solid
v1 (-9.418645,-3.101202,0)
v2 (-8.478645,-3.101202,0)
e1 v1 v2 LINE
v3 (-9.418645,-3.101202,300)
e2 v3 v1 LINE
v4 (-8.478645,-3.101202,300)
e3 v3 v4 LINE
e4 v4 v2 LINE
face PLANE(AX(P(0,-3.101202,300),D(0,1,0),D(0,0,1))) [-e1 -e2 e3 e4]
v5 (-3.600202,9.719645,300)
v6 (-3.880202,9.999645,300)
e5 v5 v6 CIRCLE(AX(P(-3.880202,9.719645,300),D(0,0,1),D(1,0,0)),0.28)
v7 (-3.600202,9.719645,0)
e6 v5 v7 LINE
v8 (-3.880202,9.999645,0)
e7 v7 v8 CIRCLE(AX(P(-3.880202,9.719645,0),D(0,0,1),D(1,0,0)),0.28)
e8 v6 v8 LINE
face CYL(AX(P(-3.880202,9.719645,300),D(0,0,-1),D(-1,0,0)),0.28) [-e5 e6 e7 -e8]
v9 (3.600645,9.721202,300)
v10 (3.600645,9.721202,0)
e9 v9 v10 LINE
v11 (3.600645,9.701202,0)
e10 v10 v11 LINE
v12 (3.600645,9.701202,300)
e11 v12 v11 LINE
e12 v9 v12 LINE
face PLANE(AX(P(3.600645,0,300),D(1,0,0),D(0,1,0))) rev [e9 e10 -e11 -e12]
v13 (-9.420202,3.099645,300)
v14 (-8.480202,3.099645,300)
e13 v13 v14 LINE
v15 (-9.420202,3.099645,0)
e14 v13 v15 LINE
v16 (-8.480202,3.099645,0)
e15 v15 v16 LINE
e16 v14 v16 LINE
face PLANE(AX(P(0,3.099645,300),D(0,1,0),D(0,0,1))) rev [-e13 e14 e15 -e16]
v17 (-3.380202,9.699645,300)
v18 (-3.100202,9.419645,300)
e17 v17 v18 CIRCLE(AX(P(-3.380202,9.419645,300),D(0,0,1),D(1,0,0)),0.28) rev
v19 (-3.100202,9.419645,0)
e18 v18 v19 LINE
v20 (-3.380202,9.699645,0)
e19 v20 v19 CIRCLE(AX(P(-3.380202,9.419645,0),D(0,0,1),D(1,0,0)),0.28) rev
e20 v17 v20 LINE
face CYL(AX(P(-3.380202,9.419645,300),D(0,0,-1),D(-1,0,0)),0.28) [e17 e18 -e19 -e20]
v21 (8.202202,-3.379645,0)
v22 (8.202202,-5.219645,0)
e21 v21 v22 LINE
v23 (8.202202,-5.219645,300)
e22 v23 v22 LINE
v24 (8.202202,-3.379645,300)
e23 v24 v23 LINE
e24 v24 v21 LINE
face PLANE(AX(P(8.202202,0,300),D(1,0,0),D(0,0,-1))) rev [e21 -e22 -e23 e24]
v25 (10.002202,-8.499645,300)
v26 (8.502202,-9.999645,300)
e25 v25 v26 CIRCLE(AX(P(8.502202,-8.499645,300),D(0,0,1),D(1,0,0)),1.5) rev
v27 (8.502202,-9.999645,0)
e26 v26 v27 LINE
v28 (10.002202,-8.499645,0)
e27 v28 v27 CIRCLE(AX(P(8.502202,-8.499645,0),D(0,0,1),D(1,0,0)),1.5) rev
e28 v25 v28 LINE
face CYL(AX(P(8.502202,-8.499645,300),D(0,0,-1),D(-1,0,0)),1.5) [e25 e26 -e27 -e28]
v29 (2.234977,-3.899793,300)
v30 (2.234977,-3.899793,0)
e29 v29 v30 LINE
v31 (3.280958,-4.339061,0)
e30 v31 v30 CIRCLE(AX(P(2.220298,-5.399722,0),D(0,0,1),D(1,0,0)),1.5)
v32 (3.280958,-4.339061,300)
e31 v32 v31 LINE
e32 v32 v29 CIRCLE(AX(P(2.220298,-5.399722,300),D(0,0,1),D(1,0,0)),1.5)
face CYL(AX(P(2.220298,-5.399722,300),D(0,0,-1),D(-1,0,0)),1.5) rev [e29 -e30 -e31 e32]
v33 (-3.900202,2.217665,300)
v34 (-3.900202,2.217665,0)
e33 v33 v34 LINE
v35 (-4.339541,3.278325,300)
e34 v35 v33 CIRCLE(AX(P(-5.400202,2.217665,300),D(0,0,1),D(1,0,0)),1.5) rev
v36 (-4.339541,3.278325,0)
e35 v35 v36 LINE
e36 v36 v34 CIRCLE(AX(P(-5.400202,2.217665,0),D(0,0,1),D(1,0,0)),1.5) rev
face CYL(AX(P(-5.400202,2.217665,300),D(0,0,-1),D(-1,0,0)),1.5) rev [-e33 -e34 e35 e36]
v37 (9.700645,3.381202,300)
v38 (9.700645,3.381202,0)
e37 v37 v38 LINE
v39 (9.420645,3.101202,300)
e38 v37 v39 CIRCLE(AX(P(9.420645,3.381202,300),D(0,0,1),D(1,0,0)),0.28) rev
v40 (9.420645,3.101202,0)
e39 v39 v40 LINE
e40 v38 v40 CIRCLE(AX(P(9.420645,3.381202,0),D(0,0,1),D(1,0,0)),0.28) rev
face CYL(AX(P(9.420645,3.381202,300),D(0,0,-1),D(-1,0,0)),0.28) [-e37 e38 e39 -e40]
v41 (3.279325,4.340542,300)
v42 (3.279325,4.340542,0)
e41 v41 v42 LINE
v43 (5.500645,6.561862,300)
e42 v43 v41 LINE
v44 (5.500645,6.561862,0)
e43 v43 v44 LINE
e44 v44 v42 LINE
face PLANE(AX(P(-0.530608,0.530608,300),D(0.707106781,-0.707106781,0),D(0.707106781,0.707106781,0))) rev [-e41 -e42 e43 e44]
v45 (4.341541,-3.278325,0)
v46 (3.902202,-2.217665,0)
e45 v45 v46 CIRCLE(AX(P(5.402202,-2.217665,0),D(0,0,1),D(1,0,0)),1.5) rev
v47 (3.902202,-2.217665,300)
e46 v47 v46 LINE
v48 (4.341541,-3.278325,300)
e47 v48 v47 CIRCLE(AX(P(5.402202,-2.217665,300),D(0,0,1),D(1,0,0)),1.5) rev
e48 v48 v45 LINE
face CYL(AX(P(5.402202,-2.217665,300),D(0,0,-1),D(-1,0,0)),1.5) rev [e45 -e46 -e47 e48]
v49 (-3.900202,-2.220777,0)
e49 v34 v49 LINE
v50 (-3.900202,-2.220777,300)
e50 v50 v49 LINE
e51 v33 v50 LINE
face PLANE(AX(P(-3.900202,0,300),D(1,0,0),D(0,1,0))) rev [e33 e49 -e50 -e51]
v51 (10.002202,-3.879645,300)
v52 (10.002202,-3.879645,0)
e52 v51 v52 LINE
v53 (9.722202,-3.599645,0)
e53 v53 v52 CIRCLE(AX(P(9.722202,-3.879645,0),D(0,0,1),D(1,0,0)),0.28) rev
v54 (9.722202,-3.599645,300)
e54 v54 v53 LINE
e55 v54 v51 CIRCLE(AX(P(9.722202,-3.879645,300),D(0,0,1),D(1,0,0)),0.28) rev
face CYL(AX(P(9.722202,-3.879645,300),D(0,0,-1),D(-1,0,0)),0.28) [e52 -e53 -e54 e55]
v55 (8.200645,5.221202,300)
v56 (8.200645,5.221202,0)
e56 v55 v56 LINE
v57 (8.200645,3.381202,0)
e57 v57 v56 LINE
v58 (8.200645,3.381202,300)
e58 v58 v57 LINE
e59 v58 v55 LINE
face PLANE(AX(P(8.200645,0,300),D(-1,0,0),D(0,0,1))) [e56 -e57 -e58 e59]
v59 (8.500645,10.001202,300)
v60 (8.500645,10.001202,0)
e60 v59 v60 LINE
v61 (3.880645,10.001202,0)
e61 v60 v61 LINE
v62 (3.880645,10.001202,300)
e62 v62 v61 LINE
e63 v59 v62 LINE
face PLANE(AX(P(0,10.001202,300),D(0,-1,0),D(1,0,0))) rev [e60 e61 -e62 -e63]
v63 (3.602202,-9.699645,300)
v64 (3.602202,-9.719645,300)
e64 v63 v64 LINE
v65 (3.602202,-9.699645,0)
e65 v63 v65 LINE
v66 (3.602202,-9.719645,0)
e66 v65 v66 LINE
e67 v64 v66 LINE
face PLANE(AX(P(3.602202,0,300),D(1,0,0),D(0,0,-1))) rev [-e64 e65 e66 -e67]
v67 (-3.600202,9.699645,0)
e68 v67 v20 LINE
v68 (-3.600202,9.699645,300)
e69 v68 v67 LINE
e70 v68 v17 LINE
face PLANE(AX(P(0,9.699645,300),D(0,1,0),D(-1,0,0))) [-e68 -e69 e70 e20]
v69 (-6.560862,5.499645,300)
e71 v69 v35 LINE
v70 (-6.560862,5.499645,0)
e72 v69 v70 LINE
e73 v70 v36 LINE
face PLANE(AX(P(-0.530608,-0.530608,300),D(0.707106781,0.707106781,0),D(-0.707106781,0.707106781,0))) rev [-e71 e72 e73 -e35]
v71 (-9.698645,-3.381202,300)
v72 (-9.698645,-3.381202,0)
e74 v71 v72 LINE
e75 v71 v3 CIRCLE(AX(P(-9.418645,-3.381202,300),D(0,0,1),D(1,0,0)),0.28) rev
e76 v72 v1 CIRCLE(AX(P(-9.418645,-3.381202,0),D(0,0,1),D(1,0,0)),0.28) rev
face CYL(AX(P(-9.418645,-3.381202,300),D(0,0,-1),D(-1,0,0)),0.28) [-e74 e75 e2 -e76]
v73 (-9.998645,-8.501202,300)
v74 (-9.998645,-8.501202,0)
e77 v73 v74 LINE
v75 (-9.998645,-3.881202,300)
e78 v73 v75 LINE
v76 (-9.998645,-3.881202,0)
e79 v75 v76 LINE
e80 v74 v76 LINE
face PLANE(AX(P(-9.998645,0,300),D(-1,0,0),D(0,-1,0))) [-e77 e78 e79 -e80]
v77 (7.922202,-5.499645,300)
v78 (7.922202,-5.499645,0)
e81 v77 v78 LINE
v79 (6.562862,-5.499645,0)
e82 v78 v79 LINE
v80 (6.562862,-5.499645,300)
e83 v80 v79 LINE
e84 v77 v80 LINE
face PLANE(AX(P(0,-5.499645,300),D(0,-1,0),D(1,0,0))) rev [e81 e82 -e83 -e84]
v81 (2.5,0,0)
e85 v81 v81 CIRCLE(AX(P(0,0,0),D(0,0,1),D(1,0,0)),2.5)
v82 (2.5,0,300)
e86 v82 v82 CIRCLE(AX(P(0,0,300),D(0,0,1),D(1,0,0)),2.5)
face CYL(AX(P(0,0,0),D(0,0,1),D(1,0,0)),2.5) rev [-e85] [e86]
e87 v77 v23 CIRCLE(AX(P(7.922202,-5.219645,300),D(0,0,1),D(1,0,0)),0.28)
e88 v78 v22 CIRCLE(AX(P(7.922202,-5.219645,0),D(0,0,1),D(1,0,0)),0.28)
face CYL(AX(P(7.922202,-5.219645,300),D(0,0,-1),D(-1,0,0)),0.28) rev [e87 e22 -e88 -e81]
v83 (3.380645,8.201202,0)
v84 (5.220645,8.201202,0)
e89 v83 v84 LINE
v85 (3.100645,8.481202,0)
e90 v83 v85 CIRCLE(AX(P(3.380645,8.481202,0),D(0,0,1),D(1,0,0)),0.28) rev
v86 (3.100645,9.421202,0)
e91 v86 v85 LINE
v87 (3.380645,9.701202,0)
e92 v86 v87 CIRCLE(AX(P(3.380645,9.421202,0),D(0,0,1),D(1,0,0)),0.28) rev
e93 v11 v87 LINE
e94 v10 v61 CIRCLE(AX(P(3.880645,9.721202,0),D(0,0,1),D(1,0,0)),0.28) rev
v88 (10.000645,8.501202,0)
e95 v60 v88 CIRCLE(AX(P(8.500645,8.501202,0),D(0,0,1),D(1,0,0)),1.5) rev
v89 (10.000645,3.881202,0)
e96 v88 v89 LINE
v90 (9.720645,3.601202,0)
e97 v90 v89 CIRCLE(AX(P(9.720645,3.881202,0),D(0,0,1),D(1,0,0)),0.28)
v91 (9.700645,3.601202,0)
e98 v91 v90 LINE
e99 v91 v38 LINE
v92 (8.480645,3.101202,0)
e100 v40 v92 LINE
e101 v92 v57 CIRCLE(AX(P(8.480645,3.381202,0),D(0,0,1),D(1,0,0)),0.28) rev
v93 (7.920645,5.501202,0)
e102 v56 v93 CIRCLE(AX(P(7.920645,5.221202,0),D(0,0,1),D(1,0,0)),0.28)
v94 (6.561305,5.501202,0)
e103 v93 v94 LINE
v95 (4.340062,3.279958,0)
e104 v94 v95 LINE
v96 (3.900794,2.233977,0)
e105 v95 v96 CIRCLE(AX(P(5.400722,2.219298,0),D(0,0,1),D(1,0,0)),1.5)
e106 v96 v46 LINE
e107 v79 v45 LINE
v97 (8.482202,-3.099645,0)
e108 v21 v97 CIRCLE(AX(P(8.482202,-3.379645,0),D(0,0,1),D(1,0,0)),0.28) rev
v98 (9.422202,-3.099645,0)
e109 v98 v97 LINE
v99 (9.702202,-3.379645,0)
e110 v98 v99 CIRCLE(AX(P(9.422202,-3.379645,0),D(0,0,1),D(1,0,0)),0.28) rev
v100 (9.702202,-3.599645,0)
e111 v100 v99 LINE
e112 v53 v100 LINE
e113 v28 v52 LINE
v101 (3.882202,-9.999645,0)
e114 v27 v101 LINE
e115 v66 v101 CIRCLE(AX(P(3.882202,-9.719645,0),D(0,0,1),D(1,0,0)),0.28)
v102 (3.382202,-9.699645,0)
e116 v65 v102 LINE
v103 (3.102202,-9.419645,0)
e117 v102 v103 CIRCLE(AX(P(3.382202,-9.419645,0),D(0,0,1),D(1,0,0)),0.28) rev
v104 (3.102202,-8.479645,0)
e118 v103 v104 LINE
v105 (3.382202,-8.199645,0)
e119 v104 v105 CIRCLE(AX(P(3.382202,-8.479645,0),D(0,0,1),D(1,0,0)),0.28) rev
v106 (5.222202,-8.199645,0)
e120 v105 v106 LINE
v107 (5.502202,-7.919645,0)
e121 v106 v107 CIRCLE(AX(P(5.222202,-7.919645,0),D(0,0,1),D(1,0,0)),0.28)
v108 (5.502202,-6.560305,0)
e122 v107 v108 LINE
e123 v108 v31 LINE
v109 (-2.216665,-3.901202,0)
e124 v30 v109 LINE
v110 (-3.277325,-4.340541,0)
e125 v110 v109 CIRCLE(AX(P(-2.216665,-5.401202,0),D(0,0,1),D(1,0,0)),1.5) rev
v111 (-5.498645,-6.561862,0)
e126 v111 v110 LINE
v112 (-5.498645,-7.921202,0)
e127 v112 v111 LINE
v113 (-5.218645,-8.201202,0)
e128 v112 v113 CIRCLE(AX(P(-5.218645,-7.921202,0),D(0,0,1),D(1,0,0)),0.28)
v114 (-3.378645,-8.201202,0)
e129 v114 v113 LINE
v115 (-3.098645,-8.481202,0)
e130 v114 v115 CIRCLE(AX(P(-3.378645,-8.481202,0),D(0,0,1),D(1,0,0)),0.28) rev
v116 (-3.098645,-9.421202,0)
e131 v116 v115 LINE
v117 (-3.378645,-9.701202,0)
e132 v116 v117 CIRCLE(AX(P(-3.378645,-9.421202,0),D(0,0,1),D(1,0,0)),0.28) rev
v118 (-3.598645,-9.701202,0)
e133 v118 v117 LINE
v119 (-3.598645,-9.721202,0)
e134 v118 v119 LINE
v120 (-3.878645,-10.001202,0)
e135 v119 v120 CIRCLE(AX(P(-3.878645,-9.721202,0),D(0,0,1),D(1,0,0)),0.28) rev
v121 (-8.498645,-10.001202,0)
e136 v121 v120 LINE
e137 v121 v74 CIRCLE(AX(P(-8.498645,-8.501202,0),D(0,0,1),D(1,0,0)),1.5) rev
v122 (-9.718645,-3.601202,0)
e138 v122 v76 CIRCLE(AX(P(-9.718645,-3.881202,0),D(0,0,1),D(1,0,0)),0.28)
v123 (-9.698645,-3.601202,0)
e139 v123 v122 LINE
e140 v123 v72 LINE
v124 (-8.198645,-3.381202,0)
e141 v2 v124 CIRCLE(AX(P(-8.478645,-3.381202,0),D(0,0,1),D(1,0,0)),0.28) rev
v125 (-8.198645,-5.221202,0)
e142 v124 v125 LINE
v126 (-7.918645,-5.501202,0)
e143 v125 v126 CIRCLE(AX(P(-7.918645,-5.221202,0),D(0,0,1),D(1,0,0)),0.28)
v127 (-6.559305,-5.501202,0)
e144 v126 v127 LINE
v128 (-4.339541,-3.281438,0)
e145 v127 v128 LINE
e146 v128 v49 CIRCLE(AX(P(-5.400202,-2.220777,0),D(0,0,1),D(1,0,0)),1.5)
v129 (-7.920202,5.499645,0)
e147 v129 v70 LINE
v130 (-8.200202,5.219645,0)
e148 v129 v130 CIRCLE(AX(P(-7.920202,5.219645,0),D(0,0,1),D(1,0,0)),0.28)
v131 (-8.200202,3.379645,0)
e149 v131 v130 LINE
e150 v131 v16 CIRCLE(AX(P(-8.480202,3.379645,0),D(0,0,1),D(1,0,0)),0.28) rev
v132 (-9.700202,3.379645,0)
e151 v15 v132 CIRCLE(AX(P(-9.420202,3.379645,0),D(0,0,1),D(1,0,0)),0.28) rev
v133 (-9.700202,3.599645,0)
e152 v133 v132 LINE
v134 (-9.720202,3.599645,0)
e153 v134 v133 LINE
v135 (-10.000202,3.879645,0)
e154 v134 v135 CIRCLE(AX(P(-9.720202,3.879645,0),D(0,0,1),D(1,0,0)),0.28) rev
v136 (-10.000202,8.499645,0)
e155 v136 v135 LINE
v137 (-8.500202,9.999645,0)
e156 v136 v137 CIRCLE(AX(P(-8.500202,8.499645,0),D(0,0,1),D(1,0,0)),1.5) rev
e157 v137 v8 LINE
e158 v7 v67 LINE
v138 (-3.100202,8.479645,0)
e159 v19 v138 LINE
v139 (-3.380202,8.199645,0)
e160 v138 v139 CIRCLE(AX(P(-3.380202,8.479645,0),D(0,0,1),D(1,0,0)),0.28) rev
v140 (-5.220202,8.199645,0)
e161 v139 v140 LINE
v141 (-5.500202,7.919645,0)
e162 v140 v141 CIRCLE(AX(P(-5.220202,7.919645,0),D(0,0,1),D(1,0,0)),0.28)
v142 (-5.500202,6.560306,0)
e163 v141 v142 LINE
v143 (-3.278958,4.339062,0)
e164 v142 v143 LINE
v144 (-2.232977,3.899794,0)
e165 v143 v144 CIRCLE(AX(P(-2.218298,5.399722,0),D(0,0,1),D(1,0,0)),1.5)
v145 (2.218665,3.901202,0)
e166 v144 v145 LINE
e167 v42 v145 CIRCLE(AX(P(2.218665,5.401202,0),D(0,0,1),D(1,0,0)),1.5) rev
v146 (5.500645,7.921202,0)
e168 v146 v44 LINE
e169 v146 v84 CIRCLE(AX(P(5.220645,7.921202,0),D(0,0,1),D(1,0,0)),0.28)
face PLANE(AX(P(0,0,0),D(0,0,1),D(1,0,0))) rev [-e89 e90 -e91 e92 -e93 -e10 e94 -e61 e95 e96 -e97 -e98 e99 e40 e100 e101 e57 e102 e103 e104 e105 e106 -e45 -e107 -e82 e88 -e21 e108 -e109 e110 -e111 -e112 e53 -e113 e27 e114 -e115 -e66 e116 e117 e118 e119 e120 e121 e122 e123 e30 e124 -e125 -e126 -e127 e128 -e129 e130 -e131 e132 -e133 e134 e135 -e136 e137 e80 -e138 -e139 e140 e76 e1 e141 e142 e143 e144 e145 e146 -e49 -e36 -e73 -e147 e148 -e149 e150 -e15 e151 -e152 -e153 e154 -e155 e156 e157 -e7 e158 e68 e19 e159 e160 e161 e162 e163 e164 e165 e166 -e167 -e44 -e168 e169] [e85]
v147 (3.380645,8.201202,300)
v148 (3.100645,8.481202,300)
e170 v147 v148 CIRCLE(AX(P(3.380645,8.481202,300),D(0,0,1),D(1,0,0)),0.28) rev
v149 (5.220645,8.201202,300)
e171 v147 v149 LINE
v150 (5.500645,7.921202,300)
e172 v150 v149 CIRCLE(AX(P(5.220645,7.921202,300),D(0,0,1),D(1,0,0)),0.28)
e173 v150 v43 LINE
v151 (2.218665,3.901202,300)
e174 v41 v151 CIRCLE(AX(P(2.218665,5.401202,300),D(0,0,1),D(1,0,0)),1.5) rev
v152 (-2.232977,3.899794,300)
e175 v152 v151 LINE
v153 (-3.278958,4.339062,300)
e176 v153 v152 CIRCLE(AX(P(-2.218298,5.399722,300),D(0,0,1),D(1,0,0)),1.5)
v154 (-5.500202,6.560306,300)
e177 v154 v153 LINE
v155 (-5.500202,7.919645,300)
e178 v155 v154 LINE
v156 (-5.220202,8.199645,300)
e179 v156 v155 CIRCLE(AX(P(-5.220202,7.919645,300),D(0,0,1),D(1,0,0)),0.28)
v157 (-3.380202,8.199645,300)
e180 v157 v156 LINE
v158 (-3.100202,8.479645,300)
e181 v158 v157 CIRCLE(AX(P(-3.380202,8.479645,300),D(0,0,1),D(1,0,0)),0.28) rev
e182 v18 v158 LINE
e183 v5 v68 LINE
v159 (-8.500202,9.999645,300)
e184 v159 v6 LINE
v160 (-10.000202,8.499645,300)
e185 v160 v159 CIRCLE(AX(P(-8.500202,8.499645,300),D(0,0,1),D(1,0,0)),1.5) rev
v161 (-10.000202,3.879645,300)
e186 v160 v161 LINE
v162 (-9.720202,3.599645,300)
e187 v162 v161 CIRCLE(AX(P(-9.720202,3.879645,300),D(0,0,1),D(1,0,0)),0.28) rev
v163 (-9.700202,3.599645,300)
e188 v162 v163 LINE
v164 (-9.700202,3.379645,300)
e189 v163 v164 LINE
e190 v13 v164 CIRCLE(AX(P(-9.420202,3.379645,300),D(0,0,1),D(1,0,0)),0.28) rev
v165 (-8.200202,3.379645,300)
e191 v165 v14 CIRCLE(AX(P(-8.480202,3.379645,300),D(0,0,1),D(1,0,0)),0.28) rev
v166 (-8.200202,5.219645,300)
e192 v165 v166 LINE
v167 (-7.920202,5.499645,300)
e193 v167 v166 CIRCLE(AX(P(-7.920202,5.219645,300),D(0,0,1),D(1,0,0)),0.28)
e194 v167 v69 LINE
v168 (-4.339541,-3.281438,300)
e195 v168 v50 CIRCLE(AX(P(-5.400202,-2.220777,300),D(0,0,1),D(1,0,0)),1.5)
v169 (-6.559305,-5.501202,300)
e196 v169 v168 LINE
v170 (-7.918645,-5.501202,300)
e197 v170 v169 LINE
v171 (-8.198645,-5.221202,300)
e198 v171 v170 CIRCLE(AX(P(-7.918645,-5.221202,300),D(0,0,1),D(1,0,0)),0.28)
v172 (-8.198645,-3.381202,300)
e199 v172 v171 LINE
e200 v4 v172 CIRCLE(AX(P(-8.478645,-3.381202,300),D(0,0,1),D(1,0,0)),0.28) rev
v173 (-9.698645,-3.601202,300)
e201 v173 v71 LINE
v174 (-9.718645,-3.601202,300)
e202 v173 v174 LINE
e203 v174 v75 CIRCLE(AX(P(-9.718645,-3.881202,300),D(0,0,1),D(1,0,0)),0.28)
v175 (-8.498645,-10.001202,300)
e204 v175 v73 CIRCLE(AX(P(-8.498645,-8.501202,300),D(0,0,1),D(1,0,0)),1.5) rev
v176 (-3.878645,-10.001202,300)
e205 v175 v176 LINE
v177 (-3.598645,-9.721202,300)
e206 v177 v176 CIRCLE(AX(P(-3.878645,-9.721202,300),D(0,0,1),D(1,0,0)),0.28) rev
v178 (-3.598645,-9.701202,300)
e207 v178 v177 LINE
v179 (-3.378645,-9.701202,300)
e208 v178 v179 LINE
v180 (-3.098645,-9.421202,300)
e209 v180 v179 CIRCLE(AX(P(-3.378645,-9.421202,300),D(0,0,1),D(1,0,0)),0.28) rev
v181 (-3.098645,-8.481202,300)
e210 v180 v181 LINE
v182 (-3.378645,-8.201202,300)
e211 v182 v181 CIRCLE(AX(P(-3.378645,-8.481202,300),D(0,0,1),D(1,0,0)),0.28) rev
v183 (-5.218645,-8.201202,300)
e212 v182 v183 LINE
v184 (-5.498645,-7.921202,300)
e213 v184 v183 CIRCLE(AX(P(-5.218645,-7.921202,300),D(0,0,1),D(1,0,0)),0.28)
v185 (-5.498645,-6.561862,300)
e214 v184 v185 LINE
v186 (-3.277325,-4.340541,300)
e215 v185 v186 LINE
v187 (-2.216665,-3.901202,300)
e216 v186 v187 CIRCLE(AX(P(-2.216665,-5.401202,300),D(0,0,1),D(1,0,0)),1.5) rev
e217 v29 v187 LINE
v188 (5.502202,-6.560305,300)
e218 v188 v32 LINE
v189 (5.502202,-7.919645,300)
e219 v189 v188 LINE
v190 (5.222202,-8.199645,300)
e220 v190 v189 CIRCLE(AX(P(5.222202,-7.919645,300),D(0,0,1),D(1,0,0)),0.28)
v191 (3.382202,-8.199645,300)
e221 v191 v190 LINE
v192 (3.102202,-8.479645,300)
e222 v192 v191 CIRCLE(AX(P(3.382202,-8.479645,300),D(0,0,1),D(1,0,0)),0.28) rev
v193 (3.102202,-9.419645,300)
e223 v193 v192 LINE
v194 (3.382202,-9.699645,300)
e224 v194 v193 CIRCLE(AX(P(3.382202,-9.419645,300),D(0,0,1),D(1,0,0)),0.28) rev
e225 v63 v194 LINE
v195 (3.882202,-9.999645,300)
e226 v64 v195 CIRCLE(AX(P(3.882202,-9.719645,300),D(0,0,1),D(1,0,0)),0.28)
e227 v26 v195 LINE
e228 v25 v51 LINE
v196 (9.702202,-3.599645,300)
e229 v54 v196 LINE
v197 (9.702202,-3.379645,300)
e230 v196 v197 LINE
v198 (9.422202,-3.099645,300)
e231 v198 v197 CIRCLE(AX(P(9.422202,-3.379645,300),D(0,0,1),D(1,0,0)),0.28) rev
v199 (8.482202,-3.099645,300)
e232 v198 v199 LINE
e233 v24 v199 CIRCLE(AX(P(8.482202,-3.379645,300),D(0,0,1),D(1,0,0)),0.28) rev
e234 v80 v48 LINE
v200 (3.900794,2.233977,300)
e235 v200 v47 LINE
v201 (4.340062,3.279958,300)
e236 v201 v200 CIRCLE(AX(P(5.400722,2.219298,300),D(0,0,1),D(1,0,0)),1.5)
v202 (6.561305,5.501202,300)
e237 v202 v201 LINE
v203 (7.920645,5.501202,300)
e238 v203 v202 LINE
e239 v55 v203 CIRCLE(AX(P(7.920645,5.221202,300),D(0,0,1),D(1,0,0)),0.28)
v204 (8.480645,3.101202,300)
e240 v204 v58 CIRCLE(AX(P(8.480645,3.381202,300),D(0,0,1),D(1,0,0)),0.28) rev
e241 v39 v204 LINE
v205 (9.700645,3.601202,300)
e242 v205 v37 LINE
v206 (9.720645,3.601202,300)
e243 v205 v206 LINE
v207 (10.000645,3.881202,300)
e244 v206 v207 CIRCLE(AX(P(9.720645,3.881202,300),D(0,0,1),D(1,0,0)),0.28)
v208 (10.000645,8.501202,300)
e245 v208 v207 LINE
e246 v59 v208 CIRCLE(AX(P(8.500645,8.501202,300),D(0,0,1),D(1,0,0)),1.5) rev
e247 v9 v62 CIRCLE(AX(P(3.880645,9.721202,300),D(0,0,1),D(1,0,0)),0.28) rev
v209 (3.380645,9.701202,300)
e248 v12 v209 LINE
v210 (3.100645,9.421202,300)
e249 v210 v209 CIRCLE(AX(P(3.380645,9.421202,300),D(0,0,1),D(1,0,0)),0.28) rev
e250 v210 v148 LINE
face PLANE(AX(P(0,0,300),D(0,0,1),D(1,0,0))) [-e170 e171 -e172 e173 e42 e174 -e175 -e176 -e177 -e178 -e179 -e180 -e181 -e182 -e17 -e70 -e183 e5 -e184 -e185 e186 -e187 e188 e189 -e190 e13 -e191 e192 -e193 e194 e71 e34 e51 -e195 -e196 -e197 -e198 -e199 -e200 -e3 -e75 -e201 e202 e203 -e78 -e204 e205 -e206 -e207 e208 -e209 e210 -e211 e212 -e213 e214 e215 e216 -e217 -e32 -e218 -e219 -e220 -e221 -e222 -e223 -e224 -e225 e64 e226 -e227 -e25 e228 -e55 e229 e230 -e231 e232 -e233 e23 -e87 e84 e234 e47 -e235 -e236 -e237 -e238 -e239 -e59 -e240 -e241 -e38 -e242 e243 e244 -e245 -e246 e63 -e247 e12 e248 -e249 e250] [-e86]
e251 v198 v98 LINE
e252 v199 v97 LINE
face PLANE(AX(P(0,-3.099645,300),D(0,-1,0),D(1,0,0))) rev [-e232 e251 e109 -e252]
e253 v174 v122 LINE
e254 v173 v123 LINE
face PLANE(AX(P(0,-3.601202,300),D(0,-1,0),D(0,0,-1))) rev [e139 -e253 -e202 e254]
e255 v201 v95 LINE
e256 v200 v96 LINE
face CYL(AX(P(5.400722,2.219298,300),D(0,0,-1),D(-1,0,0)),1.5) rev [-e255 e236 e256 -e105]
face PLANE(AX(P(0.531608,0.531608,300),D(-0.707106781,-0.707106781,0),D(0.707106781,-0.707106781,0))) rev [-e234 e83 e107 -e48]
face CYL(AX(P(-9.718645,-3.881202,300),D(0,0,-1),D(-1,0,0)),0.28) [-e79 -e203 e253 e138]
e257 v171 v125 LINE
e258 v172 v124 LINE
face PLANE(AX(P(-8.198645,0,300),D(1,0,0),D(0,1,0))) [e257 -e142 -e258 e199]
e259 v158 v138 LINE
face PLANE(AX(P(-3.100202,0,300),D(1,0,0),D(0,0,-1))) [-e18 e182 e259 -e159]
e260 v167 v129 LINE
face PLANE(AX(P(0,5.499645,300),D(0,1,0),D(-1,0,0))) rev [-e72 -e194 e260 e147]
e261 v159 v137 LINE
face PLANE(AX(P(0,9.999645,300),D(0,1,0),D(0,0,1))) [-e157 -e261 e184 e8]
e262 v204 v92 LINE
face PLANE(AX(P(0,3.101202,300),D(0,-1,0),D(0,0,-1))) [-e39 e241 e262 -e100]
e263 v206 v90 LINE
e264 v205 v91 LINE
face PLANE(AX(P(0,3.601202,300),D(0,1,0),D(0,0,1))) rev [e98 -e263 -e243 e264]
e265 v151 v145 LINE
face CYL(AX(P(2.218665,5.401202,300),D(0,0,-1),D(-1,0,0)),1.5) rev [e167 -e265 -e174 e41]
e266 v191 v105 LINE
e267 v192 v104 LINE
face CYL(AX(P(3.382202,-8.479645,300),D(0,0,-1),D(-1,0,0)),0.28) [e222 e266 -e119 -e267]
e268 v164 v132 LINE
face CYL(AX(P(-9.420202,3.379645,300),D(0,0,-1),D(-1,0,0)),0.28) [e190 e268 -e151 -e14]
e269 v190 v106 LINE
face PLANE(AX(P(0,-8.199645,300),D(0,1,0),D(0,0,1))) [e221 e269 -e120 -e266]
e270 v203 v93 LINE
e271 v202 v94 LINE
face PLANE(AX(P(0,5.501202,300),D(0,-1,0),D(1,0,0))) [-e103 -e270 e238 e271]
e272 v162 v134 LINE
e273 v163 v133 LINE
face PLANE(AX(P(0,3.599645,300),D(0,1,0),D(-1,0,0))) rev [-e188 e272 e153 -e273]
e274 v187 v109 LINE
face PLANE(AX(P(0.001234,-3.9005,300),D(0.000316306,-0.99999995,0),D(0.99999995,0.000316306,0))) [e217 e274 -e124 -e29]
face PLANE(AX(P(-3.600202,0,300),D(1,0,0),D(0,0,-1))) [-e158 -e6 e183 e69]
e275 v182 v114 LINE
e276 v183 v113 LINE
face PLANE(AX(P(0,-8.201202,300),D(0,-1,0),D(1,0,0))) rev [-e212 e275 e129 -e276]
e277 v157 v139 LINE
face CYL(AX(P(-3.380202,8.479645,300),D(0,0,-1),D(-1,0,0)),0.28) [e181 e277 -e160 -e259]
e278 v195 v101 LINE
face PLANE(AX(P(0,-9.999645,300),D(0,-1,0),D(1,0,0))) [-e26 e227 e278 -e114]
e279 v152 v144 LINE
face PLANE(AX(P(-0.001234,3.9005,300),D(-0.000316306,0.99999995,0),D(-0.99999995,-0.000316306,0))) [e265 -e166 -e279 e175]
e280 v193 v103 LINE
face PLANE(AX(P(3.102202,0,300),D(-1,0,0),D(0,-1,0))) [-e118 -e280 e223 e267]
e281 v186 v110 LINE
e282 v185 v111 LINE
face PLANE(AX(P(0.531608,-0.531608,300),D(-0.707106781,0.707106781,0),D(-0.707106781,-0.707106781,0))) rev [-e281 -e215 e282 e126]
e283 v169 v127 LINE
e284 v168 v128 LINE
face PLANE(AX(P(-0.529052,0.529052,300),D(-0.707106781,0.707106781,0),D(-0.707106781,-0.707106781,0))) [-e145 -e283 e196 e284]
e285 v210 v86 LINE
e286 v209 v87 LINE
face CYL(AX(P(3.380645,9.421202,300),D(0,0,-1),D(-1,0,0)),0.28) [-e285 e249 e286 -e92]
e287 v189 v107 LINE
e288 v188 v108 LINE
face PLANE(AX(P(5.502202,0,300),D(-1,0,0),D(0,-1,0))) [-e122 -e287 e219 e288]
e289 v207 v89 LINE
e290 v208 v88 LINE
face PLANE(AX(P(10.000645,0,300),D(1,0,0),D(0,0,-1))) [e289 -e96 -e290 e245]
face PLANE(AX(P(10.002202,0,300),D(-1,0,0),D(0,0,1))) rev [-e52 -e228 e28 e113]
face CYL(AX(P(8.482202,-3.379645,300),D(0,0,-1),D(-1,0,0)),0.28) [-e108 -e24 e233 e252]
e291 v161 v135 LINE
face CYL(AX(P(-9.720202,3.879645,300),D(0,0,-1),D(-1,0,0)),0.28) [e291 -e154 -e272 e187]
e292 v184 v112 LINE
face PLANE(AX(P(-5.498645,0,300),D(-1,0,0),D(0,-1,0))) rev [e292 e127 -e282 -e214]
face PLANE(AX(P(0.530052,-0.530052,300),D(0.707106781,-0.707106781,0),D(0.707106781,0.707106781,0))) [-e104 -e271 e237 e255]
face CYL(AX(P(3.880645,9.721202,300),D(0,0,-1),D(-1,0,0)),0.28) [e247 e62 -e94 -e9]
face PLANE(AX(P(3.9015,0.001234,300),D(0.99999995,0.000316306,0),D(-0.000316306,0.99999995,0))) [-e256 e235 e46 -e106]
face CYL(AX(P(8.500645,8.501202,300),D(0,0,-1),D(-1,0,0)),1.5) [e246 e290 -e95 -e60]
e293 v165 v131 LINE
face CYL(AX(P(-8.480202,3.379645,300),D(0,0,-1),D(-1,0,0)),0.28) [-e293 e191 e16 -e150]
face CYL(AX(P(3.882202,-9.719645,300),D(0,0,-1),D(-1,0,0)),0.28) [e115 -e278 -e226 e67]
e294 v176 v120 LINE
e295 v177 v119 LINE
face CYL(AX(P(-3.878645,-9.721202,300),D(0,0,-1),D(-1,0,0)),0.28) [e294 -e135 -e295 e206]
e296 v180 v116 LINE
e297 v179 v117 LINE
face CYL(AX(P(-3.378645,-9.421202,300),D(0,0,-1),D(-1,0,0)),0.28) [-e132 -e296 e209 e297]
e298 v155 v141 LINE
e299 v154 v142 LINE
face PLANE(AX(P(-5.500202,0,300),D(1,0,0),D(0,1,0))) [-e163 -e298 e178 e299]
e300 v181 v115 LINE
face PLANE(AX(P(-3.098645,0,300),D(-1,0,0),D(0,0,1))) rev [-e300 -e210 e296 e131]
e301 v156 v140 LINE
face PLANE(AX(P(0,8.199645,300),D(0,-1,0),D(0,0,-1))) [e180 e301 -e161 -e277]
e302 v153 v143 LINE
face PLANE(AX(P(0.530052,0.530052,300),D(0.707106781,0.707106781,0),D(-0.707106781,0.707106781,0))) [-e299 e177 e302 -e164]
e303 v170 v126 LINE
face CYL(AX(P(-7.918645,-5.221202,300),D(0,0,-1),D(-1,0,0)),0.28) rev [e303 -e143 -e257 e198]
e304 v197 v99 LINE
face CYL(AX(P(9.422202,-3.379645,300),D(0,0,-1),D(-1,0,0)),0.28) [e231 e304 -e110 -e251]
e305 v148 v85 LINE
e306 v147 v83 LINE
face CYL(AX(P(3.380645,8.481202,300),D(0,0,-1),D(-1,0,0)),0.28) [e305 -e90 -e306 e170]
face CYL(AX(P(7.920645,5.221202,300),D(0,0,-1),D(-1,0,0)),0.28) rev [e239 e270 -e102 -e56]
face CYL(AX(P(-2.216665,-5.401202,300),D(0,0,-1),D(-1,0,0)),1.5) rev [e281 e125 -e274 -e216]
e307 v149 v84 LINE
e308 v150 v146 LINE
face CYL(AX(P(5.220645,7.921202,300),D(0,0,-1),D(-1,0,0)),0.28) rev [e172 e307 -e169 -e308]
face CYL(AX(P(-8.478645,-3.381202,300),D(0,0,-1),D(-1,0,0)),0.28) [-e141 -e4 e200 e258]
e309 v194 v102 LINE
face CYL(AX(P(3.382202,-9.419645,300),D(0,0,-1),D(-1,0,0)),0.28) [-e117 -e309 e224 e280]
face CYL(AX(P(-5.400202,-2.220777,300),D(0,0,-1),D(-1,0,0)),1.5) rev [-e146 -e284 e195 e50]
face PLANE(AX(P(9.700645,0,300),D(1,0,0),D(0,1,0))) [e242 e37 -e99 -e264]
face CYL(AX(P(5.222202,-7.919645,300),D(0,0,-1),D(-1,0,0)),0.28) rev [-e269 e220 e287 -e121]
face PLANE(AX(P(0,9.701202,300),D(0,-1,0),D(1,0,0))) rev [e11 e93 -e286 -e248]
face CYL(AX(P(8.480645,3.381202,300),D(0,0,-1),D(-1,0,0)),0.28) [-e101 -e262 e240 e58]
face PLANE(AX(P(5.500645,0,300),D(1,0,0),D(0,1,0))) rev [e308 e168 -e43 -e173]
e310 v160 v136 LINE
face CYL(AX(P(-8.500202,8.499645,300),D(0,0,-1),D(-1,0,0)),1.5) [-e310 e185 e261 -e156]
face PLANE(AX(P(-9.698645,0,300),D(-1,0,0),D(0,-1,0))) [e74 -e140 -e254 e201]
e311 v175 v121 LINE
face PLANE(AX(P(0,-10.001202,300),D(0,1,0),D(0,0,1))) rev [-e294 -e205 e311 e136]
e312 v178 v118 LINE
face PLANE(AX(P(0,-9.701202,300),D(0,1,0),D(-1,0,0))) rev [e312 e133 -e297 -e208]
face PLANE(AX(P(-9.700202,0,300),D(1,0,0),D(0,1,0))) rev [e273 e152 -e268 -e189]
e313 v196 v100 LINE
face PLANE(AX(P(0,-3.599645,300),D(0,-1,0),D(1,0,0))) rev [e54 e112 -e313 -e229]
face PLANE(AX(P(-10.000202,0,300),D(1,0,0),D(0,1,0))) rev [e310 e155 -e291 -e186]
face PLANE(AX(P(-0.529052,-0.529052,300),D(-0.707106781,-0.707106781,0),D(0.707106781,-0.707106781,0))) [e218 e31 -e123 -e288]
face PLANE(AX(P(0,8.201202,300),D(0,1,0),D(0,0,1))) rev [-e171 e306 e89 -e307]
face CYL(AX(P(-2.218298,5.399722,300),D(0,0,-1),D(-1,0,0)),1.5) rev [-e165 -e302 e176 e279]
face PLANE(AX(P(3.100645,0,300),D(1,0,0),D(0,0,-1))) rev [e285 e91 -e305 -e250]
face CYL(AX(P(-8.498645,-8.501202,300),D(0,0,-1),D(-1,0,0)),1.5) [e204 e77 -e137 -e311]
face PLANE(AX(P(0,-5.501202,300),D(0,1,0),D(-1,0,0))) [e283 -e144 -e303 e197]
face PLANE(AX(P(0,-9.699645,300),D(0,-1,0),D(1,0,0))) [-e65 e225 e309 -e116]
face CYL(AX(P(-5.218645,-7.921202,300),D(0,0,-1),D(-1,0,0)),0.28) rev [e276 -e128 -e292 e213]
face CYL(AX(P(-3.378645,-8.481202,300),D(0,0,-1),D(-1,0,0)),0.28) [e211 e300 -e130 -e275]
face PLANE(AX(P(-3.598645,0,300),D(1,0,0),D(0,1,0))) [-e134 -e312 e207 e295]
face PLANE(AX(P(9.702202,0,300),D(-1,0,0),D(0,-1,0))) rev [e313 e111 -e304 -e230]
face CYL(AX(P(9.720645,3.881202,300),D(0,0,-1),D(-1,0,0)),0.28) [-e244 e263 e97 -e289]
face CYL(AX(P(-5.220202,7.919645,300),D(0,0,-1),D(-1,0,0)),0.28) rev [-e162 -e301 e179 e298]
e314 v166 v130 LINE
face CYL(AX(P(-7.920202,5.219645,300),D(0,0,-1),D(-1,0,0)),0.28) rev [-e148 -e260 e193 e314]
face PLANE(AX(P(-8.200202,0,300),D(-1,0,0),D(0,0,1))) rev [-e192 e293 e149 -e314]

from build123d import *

# Parameters (mm, degrees)
BOSS_EXTRUDE1_DEPTH = 300
F_3DSKETCH2_R       = 2.5
CUT_EXTRUDE1_DEPTH  = 301.333261686


with BuildPart() as part:
    # Sketch1 → Boss-Extrude1 (new body)
    with BuildSketch(Plane.XY):
        with BuildLine():
            ThreePointArc((-4.339541497, 3.27832502), (-4.01438237, 2.791689997), (-3.900201668, 2.217664848))
            Line((-3.900201668, 2.217664848), (-3.900201668, -2.220777458))
            ThreePointArc((-3.900201668, -2.220777458), (-4.013982246, -2.793835668), (-4.338062619, -3.279956687))
            ThreePointArc((-4.338062619, -3.279956687), (-4.338801799, -3.280697416), (-4.339541497, -3.28143763))
            Line((-4.339541497, -3.28143763), (-6.559305445, -5.501201578))
            Line((-6.559305445, -5.501201578), (-7.918645273, -5.501201578))
            ThreePointArc((-7.918645273, -5.501201578), (-8.116635172, -5.419191476), (-8.198645273, -5.221201578))
            Line((-8.198645273, -5.221201578), (-8.198645273, -3.381201578))
            ThreePointArc((-8.198645273, -3.381201578), (-8.280655374, -3.183211679), (-8.478645273, -3.101201578))
            Line((-8.478645273, -3.101201578), (-9.418645273, -3.101201578))
            ThreePointArc((-9.418645273, -3.101201578), (-9.616635172, -3.183211679), (-9.698645273, -3.381201578))
            Line((-9.698645273, -3.381201578), (-9.698645273, -3.601201578))
            Line((-9.698645273, -3.601201578), (-9.718645273, -3.601201578))
            ThreePointArc((-9.718645273, -3.601201578), (-9.916635172, -3.683211679), (-9.998645273, -3.881201578))
            Line((-9.998645273, -3.881201578), (-9.998645273, -8.501201578))
            ThreePointArc((-9.998645273, -8.501201578), (-9.559305445, -9.561861749), (-8.498645273, -10.001201578))
            Line((-8.498645273, -10.001201578), (-3.878645273, -10.001201578))
            ThreePointArc((-3.878645273, -10.001201578), (-3.680655374, -9.919191476), (-3.598645273, -9.721201578))
            Line((-3.598645273, -9.721201578), (-3.598645273, -9.701201578))
            Line((-3.598645273, -9.701201578), (-3.378645273, -9.701201578))
            ThreePointArc((-3.378645273, -9.701201578), (-3.180655374, -9.619191476), (-3.098645273, -9.421201578))
            Line((-3.098645273, -9.421201578), (-3.098645273, -8.481201578))
            ThreePointArc((-3.098645273, -8.481201578), (-3.180655374, -8.283211679), (-3.378645273, -8.201201578))
            Line((-3.378645273, -8.201201578), (-5.218645273, -8.201201578))
            ThreePointArc((-5.218645273, -8.201201578), (-5.416635172, -8.119191476), (-5.498645273, -7.921201578))
            Line((-5.498645273, -7.921201578), (-5.498645273, -6.561861749))
            Line((-5.498645273, -6.561861749), (-3.277324929, -4.340541406))
            ThreePointArc((-3.277324929, -4.340541406), (-2.790689906, -4.015382279), (-2.216664757, -3.901201578))
            Line((-2.216664757, -3.901201578), (2.234977304, -3.899793498))
            ThreePointArc((2.234977304, -3.899793498), (2.801097117, -4.016727825), (3.280957809, -4.339061494))
            Line((3.280957809, -4.339061494), (5.502201668, -6.560305354))
            Line((5.502201668, -6.560305354), (5.502201668, -7.919645182))
            ThreePointArc((5.502201668, -7.919645182), (5.420191567, -8.117635081), (5.222201668, -8.199645182))
            Line((5.222201668, -8.199645182), (3.382201668, -8.199645182))
            ThreePointArc((3.382201668, -8.199645182), (3.18421177, -8.281655283), (3.102201668, -8.479645182))
            Line((3.102201668, -8.479645182), (3.102201668, -9.419645182))
            ThreePointArc((3.102201668, -9.419645182), (3.18421177, -9.617635081), (3.382201668, -9.699645182))
            Line((3.382201668, -9.699645182), (3.602201668, -9.699645182))
            Line((3.602201668, -9.699645182), (3.602201668, -9.719645182))
            ThreePointArc((3.602201668, -9.719645182), (3.68421177, -9.917635081), (3.882201668, -9.999645182))
            Line((3.882201668, -9.999645182), (8.502201668, -9.999645182))
            ThreePointArc((8.502201668, -9.999645182), (9.56286184, -9.560305354), (10.002201668, -8.499645182))
            Line((10.002201668, -8.499645182), (10.002201668, -3.879645182))
            ThreePointArc((10.002201668, -3.879645182), (9.920191567, -3.681655283), (9.722201668, -3.599645182))
            Line((9.722201668, -3.599645182), (9.702201668, -3.599645182))
            Line((9.702201668, -3.599645182), (9.702201668, -3.379645182))
            ThreePointArc((9.702201668, -3.379645182), (9.620191567, -3.181655283), (9.422201668, -3.099645182))
            Line((9.422201668, -3.099645182), (8.482201668, -3.099645182))
            ThreePointArc((8.482201668, -3.099645182), (8.28421177, -3.181655283), (8.202201668, -3.379645182))
            Line((8.202201668, -3.379645182), (8.202201668, -5.219645182))
            ThreePointArc((8.202201668, -5.219645182), (8.120191567, -5.417635081), (7.922201668, -5.499645182))
            Line((7.922201668, -5.499645182), (6.56286184, -5.499645182))
            Line((6.56286184, -5.499645182), (4.341541497, -3.278324838))
            ThreePointArc((4.341541497, -3.278324838), (4.01638237, -2.791689815), (3.902201668, -2.217664667))
            Line((3.902201668, -2.217664667), (3.900793589, 2.233977395))
            ThreePointArc((3.900793589, 2.233977395), (4.017727916, 2.800097207), (4.340061585, 3.2799579))
            Line((4.340061585, 3.2799579), (6.561305445, 5.501201759))
            Line((6.561305445, 5.501201759), (7.920645273, 5.501201759))
            ThreePointArc((7.920645273, 5.501201759), (8.118635172, 5.419191658), (8.200645273, 5.221201759))
            Line((8.200645273, 5.221201759), (8.200645273, 3.381201759))
            ThreePointArc((8.200645273, 3.381201759), (8.282655374, 3.183211861), (8.480645273, 3.101201759))
            Line((8.480645273, 3.101201759), (9.420645273, 3.101201759))
            ThreePointArc((9.420645273, 3.101201759), (9.618635172, 3.183211861), (9.700645273, 3.381201759))
            Line((9.700645273, 3.381201759), (9.700645273, 3.601201759))
            Line((9.700645273, 3.601201759), (9.720645273, 3.601201759))
            ThreePointArc((9.720645273, 3.601201759), (9.918635172, 3.683211861), (10.000645273, 3.881201759))
            Line((10.000645273, 3.881201759), (10.000645273, 8.501201759))
            ThreePointArc((10.000645273, 8.501201759), (9.561305445, 9.561861931), (8.500645273, 10.001201759))
            Line((8.500645273, 10.001201759), (3.880645273, 10.001201759))
            ThreePointArc((3.880645273, 10.001201759), (3.682655374, 9.919191658), (3.600645273, 9.721201759))
            Line((3.600645273, 9.721201759), (3.600645273, 9.701201759))
            Line((3.600645273, 9.701201759), (3.380645273, 9.701201759))
            ThreePointArc((3.380645273, 9.701201759), (3.182655374, 9.619191658), (3.100645273, 9.421201759))
            Line((3.100645273, 9.421201759), (3.100645273, 8.481201759))
            ThreePointArc((3.100645273, 8.481201759), (3.182655374, 8.283211861), (3.380645273, 8.201201759))
            Line((3.380645273, 8.201201759), (5.220645273, 8.201201759))
            ThreePointArc((5.220645273, 8.201201759), (5.418635172, 8.119191658), (5.500645273, 7.921201759))
            Line((5.500645273, 7.921201759), (5.500645273, 6.561861931))
            Line((5.500645273, 6.561861931), (3.279324929, 4.340541588))
            ThreePointArc((3.279324929, 4.340541588), (2.792689906, 4.015382461), (2.218664757, 3.901201759))
            Line((2.218664757, 3.901201759), (-2.232977304, 3.89979368))
            ThreePointArc((-2.232977304, 3.89979368), (-2.799097117, 4.016728006), (-3.278957809, 4.339061676))
            Line((-3.278957809, 4.339061676), (-5.500201668, 6.560305535))
            Line((-5.500201668, 6.560305535), (-5.500201668, 7.919645364))
            ThreePointArc((-5.500201668, 7.919645364), (-5.418191567, 8.117635262), (-5.220201668, 8.199645364))
            Line((-5.220201668, 8.199645364), (-3.380201668, 8.199645364))
            ThreePointArc((-3.380201668, 8.199645364), (-3.18221177, 8.281655465), (-3.100201668, 8.479645364))
            Line((-3.100201668, 8.479645364), (-3.100201668, 9.419645364))
            ThreePointArc((-3.100201668, 9.419645364), (-3.18221177, 9.617635262), (-3.380201668, 9.699645364))
            Line((-3.380201668, 9.699645364), (-3.600201668, 9.699645364))
            Line((-3.600201668, 9.699645364), (-3.600201668, 9.719645364))
            ThreePointArc((-3.600201668, 9.719645364), (-3.68221177, 9.917635262), (-3.880201668, 9.999645364))
            Line((-3.880201668, 9.999645364), (-8.500201668, 9.999645364))
            ThreePointArc((-8.500201668, 9.999645364), (-9.56086184, 9.560305535), (-10.000201668, 8.499645364))
            Line((-10.000201668, 8.499645364), (-10.000201668, 3.879645364))
            ThreePointArc((-10.000201668, 3.879645364), (-9.918191567, 3.681655465), (-9.720201668, 3.599645364))
            Line((-9.720201668, 3.599645364), (-9.700201668, 3.599645364))
            Line((-9.700201668, 3.599645364), (-9.700201668, 3.379645364))
            ThreePointArc((-9.700201668, 3.379645364), (-9.618191567, 3.181655465), (-9.420201668, 3.099645364))
            Line((-9.420201668, 3.099645364), (-8.480201668, 3.099645364))
            ThreePointArc((-8.480201668, 3.099645364), (-8.28221177, 3.181655465), (-8.200201668, 3.379645364))
            Line((-8.200201668, 3.379645364), (-8.200201668, 5.219645364))
            ThreePointArc((-8.200201668, 5.219645364), (-8.118191567, 5.417635262), (-7.920201668, 5.499645364))
            Line((-7.920201668, 5.499645364), (-6.56086184, 5.499645364))
            Line((-6.56086184, 5.499645364), (-4.339541497, 3.27832502))
        make_face()
    extrude(amount=BOSS_EXTRUDE1_DEPTH)

    # 3DSketch2 → Cut-Extrude1 (cut, through all)
    with BuildSketch(Plane.XY):
        Circle(F_3DSKETCH2_R)
    extrude(amount=CUT_EXTRUDE1_DEPTH, mode=Mode.SUBTRACT)


solid = part.part
